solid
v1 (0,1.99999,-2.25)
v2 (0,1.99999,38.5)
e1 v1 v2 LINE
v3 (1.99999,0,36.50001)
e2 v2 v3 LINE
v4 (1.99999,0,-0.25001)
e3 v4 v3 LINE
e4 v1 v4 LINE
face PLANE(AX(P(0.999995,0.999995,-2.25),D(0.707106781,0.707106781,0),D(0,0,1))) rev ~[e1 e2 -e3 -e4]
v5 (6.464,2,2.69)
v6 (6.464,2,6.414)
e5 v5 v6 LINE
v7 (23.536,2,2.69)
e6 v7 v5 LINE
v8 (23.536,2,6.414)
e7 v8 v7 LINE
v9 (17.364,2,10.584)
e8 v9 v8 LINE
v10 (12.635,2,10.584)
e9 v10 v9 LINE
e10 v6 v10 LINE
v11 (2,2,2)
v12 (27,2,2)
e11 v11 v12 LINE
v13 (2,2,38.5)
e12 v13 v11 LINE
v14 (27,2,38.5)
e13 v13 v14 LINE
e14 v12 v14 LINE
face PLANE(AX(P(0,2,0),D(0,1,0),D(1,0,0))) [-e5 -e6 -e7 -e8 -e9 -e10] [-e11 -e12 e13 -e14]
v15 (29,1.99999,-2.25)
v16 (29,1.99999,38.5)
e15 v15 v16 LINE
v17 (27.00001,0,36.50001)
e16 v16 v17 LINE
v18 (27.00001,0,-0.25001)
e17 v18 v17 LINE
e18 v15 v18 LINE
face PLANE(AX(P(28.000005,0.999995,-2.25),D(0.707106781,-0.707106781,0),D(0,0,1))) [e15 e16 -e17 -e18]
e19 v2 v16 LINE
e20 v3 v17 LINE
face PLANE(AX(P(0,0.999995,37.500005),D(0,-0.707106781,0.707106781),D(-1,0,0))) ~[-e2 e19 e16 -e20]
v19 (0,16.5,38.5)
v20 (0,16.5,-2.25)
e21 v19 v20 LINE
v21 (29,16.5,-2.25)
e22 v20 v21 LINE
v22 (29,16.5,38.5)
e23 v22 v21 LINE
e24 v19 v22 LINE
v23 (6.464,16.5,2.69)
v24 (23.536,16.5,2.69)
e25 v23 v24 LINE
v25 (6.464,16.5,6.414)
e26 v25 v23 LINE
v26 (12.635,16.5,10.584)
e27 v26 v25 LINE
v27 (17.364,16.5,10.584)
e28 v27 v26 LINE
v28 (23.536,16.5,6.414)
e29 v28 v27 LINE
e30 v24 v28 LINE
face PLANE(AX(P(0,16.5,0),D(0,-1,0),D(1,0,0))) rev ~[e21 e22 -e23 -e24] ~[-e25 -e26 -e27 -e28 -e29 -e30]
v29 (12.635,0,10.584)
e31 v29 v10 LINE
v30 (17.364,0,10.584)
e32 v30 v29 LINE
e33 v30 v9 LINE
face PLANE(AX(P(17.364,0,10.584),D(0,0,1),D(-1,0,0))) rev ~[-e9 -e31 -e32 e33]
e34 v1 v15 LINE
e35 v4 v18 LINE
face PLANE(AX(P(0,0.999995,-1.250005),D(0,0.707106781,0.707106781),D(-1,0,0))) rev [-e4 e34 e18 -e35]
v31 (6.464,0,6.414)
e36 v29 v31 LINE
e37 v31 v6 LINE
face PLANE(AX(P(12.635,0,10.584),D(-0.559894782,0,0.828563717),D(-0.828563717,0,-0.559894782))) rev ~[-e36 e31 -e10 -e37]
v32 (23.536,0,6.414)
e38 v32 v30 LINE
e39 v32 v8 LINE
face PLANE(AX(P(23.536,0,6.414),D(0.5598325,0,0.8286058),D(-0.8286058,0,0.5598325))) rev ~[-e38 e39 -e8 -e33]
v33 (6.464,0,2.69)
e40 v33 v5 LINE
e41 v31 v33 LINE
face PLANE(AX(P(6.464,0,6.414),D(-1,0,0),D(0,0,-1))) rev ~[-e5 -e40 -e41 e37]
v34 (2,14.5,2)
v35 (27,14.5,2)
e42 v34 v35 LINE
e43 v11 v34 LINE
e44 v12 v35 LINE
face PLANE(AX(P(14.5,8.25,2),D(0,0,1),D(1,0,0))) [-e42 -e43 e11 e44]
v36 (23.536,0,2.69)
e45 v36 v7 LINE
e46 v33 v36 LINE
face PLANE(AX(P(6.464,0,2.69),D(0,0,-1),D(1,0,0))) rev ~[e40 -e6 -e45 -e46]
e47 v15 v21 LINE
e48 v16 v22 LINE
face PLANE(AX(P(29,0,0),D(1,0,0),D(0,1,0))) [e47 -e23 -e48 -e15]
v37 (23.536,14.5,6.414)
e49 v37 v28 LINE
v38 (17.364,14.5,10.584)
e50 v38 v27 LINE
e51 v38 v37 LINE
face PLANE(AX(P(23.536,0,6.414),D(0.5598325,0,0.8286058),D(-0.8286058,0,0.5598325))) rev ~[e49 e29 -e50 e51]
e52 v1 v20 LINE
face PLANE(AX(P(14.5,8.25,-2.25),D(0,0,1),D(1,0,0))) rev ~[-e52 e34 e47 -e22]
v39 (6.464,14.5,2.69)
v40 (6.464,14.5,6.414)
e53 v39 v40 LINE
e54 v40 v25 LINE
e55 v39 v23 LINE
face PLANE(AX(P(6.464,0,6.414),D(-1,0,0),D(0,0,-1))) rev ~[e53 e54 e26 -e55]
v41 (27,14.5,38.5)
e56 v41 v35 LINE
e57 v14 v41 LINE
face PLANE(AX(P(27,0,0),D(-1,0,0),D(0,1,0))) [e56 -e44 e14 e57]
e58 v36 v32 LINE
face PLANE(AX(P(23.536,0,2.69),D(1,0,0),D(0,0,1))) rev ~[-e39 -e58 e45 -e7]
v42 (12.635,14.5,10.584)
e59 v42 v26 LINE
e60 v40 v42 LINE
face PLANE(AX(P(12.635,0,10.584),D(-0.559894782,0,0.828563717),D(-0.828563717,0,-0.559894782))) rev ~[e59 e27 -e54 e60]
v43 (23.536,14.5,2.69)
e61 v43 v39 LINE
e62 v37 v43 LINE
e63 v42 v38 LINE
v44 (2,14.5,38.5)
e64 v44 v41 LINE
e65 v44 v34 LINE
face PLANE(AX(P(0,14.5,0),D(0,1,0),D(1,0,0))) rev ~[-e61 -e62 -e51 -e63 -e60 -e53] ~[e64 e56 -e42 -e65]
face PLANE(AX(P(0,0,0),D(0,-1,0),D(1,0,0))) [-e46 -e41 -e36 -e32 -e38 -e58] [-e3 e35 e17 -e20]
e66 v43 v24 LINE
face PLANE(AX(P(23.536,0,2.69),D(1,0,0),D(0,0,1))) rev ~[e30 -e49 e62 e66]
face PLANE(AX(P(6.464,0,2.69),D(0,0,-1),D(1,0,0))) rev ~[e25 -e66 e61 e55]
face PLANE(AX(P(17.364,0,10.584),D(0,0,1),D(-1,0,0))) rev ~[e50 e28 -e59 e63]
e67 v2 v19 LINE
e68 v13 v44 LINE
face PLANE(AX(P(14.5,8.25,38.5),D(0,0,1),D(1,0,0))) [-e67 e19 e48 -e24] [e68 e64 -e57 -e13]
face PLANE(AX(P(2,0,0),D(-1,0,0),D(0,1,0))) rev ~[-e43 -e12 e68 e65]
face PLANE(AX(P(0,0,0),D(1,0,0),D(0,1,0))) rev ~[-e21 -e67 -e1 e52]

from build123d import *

# Parameters (mm, degrees)
F0_W     = 29
F0_H     = 16.5
F1_DEPTH = 38.5
F2_T     = -2
F3_DEPTH = 2.25
F4_SIZE  = 1.99999
F6_DEPTH = 25


# Not quite as in the source:
# - a fillet or chamfer is up to 0.001 mm smaller than in the source, because OpenCascade refuses the exact size


with BuildPart() as f1:
    # F0 (on Top) → F1 (new body)
    with BuildSketch(Plane.XY):
        with Locations((14.5, 8.25)):
            Rectangle(F0_W, F0_H)
    extrude(amount=F1_DEPTH)

    # F2
    f2_openings = [f1.faces().sort_by_distance(p)[0] for p in [
        (14.5, 8.25, 38.5),
    ]]
    offset(amount=F2_T, openings=f2_openings)

    # F3 (add): a face of the model
    f3_faces = [f1.faces().sort_by_distance(p)[0] for p in [
        (14.5, 8.25, 0),
    ]]
    extrude(f3_faces, amount=F3_DEPTH)

    # F4 (size 2 in the source; OpenCascade refuses exactly that, so slightly less here)
    f4_edges = [f1.edges().sort_by_distance(p)[0] for p in [
        (29, 0, 18.125),
        (0, 0, 18.125),
        (14.5, 0, 38.5),
        (14.5, 0, -2.25),
    ]]
    chamfer(f4_edges, length=F4_SIZE)

    # F5 (on face) → F6 (cut)
    with BuildSketch(Plane.XZ):
        Polygon((17.364, 10.584), (12.635, 10.584), (6.464, 6.414), (6.464, 2.69), (23.536, 2.69), (23.536, 6.414), align=None)
    extrude(amount=-F6_DEPTH, mode=Mode.SUBTRACT)


solid = f1.part
